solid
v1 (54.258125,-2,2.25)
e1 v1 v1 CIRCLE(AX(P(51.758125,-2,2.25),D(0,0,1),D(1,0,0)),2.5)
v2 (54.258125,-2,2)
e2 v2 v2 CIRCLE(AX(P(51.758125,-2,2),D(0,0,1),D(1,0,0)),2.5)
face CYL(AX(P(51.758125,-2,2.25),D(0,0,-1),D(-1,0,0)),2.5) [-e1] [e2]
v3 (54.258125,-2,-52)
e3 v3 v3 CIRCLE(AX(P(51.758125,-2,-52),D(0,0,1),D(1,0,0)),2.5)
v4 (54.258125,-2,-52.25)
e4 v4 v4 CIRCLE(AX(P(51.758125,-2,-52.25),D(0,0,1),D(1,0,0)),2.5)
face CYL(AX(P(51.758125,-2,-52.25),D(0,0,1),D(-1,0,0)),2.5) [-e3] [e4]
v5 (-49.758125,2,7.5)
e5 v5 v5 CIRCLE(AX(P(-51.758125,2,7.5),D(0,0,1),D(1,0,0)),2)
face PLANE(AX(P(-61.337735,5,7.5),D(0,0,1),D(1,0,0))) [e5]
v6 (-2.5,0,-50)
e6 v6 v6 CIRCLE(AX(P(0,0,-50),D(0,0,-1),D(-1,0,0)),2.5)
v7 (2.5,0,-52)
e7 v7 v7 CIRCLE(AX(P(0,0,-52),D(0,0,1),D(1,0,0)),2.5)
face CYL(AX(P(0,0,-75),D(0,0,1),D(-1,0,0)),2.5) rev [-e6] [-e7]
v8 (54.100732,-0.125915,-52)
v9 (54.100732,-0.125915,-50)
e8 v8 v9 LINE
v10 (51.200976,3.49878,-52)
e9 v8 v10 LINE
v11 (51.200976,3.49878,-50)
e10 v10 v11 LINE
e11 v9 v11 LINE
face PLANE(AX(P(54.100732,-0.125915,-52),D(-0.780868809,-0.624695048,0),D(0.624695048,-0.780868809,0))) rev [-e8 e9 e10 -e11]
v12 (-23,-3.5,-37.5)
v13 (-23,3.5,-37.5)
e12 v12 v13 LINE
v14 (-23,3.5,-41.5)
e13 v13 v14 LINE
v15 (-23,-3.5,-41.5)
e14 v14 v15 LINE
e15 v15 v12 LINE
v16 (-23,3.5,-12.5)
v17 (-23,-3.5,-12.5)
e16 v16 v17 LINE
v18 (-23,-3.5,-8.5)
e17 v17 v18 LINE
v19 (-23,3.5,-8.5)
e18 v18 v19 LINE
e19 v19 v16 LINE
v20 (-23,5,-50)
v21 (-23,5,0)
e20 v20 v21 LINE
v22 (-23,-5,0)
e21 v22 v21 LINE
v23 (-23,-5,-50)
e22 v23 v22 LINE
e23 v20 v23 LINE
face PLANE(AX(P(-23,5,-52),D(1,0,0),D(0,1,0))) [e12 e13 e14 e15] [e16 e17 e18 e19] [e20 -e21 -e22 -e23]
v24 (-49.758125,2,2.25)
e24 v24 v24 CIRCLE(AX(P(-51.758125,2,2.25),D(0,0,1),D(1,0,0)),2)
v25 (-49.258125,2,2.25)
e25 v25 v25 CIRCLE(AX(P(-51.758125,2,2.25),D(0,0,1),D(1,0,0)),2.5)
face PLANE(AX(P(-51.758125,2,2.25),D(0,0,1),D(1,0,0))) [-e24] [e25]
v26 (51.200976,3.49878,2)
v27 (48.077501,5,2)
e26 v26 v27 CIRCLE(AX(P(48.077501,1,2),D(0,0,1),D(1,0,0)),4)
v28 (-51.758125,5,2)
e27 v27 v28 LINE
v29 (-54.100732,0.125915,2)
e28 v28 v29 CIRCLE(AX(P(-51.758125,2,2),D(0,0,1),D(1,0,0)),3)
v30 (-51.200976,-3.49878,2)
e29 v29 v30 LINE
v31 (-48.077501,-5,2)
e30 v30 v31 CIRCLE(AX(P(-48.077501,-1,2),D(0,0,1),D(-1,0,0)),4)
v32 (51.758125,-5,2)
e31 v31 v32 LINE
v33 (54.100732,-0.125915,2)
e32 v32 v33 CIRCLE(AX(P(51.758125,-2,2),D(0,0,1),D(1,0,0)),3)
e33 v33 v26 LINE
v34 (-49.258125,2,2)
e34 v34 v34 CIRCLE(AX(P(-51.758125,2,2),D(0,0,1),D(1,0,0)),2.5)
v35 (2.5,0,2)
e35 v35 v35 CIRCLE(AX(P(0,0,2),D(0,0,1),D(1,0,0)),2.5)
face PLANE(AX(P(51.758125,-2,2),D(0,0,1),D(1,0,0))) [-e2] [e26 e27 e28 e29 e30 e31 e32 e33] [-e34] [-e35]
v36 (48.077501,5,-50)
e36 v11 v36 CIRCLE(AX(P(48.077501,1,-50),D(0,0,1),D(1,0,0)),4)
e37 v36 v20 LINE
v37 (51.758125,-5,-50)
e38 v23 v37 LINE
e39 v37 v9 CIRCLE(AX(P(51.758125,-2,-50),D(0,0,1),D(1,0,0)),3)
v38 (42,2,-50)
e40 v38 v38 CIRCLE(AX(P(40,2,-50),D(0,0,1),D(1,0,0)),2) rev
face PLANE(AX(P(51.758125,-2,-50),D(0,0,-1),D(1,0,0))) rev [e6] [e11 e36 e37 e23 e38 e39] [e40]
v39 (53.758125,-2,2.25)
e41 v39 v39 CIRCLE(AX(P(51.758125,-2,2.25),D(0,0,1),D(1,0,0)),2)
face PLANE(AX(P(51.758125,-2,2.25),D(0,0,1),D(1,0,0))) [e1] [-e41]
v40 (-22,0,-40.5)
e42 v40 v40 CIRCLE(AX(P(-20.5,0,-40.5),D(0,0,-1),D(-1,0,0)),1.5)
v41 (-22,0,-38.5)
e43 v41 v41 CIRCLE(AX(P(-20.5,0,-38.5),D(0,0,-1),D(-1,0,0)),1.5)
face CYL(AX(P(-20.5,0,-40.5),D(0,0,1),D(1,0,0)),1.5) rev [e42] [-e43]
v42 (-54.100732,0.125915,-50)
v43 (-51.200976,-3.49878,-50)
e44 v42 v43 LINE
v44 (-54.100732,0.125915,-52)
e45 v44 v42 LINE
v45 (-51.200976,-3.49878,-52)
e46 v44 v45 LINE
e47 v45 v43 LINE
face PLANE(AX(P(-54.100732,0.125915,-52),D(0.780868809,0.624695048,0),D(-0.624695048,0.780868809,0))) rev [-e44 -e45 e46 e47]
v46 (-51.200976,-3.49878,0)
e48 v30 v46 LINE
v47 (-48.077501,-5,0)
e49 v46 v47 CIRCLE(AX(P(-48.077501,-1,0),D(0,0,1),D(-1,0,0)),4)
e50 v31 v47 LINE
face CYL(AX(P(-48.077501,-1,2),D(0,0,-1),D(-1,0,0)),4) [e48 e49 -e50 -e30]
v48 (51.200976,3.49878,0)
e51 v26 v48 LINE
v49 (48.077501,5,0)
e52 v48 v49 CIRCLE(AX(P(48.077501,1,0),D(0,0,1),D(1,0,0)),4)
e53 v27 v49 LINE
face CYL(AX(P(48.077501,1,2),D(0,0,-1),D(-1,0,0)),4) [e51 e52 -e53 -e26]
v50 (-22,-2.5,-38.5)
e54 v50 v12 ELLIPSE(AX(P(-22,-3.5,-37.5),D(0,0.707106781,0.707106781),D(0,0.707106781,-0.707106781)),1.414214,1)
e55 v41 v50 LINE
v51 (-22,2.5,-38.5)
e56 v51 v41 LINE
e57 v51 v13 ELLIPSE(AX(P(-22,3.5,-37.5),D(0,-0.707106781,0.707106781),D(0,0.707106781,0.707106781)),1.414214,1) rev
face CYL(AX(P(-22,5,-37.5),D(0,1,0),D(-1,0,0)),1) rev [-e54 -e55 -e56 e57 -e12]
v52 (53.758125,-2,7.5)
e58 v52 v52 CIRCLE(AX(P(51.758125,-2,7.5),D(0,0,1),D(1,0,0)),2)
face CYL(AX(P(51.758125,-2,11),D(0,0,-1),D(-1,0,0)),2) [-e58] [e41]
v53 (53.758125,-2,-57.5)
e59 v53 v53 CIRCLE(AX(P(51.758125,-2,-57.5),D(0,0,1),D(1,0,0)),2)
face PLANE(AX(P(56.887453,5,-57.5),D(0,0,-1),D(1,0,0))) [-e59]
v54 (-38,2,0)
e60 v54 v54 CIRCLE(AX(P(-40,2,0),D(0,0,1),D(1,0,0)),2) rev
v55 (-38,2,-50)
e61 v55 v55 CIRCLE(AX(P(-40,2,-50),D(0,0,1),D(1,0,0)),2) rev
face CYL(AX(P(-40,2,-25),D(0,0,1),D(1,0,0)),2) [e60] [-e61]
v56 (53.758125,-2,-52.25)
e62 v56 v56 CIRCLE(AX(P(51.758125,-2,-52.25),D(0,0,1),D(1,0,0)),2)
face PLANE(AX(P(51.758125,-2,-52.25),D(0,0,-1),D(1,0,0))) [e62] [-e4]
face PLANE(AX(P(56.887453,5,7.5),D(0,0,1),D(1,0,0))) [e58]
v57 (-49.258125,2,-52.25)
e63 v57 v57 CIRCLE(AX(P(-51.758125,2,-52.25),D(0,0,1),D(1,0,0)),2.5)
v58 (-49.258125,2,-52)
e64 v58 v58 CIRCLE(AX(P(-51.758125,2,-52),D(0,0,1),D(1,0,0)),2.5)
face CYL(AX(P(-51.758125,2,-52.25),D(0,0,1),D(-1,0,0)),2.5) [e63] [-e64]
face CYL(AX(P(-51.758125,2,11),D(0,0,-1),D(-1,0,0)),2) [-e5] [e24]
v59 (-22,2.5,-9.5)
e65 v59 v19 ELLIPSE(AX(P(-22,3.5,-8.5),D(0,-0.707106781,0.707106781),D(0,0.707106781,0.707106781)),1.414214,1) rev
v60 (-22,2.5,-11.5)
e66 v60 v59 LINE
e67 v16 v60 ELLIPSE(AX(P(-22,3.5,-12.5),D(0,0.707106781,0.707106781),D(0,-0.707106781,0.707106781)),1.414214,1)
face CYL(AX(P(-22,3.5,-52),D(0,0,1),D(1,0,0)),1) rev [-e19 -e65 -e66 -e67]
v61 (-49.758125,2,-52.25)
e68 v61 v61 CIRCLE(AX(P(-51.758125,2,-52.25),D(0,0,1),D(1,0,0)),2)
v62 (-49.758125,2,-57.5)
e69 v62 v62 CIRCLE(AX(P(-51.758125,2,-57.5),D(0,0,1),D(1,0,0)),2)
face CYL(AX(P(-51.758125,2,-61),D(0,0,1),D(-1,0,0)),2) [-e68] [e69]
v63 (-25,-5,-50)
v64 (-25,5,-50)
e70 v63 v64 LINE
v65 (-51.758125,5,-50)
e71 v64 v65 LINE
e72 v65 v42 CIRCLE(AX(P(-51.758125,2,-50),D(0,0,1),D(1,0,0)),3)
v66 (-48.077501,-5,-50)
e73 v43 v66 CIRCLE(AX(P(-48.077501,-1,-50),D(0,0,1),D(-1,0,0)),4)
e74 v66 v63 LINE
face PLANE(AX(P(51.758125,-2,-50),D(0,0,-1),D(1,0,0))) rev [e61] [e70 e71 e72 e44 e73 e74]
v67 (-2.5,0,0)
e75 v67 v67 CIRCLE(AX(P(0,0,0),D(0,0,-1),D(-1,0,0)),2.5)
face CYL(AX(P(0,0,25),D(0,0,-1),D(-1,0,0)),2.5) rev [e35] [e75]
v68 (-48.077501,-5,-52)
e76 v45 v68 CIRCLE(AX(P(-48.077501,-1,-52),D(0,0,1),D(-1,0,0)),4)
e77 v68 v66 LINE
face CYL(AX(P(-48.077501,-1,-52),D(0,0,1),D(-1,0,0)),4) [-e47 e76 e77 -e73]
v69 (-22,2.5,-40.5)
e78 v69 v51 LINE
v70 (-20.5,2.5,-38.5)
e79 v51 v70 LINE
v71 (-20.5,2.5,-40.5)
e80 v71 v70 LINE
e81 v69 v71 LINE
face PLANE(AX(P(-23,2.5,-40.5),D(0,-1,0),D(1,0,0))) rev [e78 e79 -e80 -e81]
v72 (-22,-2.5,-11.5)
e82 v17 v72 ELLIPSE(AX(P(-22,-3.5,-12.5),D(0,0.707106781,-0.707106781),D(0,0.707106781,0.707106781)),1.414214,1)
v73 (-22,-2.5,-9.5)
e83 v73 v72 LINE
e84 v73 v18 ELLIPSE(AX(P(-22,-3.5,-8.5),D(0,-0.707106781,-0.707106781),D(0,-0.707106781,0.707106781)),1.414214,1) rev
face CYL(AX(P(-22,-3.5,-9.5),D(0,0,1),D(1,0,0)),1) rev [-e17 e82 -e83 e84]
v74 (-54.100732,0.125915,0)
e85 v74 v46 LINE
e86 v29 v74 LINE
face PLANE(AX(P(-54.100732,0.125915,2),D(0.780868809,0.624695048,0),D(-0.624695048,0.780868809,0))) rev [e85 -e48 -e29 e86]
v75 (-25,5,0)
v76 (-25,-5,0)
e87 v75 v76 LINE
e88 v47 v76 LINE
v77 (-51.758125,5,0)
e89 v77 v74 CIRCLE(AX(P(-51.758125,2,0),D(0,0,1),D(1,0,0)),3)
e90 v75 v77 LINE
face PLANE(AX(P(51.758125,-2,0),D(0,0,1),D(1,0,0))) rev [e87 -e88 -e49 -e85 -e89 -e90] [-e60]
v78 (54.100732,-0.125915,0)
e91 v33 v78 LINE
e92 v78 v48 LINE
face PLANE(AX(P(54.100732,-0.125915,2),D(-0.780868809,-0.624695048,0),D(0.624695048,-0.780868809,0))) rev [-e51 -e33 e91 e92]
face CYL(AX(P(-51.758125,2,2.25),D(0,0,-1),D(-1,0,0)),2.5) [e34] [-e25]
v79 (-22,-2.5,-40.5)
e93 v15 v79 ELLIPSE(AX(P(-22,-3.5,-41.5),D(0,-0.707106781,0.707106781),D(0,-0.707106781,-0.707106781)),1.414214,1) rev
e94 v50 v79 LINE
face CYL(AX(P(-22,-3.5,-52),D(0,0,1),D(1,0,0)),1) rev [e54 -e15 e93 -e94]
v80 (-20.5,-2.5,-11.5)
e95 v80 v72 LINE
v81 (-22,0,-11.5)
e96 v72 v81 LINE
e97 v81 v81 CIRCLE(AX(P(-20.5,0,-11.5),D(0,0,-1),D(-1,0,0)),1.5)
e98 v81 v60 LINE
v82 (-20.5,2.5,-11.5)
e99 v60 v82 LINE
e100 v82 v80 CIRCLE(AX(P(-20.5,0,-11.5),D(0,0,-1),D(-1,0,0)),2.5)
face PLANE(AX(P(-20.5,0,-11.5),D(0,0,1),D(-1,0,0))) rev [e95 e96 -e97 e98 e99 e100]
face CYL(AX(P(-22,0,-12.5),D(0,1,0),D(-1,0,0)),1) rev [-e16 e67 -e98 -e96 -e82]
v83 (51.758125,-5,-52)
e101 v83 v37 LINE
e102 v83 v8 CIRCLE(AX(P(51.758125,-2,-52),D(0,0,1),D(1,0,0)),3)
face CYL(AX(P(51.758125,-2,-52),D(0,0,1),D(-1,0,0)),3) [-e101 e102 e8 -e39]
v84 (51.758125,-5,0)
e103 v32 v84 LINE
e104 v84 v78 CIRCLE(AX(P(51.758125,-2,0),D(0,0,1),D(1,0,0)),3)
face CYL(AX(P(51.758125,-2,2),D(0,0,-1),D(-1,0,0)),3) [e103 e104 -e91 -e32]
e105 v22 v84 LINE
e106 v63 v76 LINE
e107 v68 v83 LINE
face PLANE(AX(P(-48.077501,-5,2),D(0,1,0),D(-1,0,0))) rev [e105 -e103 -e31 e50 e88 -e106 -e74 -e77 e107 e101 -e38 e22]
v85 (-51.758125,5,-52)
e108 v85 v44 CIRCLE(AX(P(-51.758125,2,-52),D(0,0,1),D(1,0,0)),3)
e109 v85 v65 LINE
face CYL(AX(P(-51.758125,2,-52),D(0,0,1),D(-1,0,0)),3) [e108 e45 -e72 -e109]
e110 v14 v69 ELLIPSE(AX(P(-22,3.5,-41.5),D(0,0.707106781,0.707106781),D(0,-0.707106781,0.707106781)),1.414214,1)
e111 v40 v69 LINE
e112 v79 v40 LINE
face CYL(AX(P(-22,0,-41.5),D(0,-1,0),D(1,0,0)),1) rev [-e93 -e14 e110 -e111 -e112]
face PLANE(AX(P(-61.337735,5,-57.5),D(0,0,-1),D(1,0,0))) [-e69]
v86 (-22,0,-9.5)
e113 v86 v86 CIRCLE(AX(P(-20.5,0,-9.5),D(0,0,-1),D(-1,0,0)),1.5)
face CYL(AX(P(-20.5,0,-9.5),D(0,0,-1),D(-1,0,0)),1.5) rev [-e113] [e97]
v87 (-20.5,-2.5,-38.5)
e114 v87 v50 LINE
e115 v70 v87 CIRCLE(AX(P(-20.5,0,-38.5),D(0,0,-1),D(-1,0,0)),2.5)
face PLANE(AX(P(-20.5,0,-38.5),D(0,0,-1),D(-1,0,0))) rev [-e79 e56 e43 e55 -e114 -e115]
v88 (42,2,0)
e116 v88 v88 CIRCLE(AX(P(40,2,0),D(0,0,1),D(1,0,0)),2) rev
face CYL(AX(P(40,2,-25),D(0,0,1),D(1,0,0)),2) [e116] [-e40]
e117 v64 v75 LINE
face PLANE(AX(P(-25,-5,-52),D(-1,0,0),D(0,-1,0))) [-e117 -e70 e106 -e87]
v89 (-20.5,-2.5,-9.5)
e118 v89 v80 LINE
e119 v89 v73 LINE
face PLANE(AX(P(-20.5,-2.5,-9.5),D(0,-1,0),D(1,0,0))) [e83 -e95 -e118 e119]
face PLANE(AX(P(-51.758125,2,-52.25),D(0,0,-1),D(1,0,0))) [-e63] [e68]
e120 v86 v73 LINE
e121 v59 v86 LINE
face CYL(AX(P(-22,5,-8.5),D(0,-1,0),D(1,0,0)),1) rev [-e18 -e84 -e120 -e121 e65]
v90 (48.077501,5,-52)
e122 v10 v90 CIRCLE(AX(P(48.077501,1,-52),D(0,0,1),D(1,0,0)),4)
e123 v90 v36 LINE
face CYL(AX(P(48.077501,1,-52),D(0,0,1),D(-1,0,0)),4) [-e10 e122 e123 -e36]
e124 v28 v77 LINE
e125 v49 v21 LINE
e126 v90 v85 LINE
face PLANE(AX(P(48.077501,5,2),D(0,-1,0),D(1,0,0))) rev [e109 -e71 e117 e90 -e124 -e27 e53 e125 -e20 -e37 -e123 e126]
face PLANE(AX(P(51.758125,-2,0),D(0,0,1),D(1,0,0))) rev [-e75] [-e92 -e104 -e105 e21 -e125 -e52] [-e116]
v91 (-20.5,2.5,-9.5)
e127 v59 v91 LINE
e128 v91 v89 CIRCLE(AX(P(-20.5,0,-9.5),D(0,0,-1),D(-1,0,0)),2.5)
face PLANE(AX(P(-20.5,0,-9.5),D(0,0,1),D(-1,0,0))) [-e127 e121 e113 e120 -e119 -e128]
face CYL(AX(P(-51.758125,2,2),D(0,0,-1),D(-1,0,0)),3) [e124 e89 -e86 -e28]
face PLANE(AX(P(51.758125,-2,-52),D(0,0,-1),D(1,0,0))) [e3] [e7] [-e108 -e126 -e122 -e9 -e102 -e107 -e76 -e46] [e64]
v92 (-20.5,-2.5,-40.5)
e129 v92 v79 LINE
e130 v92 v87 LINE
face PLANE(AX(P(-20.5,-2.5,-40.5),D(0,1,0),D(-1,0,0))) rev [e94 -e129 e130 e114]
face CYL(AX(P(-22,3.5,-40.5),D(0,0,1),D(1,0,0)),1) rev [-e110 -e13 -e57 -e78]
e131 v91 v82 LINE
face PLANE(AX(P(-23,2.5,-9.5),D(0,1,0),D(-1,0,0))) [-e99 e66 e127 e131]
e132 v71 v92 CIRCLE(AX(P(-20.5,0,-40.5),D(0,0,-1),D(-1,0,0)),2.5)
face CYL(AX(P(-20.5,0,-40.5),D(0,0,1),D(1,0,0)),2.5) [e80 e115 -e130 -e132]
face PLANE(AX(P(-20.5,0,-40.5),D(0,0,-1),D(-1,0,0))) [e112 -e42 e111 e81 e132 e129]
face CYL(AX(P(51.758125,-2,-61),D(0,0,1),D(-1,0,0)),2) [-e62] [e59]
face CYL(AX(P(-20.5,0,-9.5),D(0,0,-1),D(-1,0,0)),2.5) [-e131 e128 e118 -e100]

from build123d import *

# Parameters (mm, degrees)
EXTRUDE_1_DEPTH          = 2
SKETCH_3_R               = 2
EXTRUDE_2_DEPTH          = 9
SKETCH_4_R               = 2
EXTRUDE_3_DEPTH          = 25
SKETCH_5_R               = 2.5
CUT_EXTRUDE_2_DEPTH      = 25
SKETCH_7_R               = 2.5
EXTRUDE_4_DEPTH          = 0.25
CUT_EXTRUDE_3_DEPTH      = 61.402419684
CUT_EXTRUDE_3_DEPTH_BACK = 10
SKETCH_8_W               = 14.774450984
SKETCH_8_H               = 5.235041687
SKETCH_8_W_2             = 21.085271114
SKETCH_8_H_2             = 10.942988806
SKETCH_9_W               = 2
SKETCH_9_H               = 10
EXTRUDE_5_DEPTH          = 54
EXTRUDE_START            = 13.5
SKETCH_10_R              = 1.5
EXTRUDE_6_DEPTH          = 2
FILLET_3_R               = 1
FILLET_3_OF_MIRROR_5_R   = 1


with BuildPart() as part:
    # 草圖1 → 填料-伸長1 (new body)
    with BuildSketch(Plane.XY):
        with BuildLine():
            Line((-48.07750061, -5), (51.758125458, -5))
            ThreePointArc((51.758125458, -5), (54.462035166, -3.299566191), (54.100731886, -0.125914857))
            Line((54.100731886, -0.125914857), (51.200975848, 3.49878019))
            ThreePointArc((51.200975848, 3.49878019), (49.810255532, 4.605212945), (48.07750061, 5))
            Line((48.07750061, 5), (-51.758125458, 5))
            ThreePointArc((-51.758125458, 5), (-54.462035166, 3.299566191), (-54.100731886, 0.125914857))
            Line((-54.100731886, 0.125914857), (-51.200975848, -3.49878019))
            ThreePointArc((-51.200975848, -3.49878019), (-49.810255532, -4.605212945), (-48.07750061, -5))
        make_face()
    extrude(amount=EXTRUDE_1_DEPTH)

    # 草圖3 → 填料-伸長2 (add)
    with BuildSketch(Plane.XY.offset(2)):
        with Locations((-51.758125458, 2)):
            Circle(SKETCH_3_R)
        with Locations((51.758125458, -2)):
            Circle(SKETCH_3_R)
    extrude(amount=EXTRUDE_2_DEPTH)

    # 草圖4 → 填料-伸長3 (add)
    with BuildSketch(Plane(origin=(0, 0, 0), x_dir=(-1, 0, 0), z_dir=(0, 0, -1))):
        with Locations(Location((-40, 2, 0), (0, 0, 180))):
            Circle(SKETCH_4_R)
        with Locations(Location((40, 2, 0), (0, 0, 180))):
            Circle(SKETCH_4_R)
    extrude(amount=EXTRUDE_3_DEPTH)

    # 草圖5 → 除料-伸長2 (cut)
    with BuildSketch(Plane(origin=(0, 0, 0), x_dir=(-1, 0, 0), z_dir=(0, 0, -1))):
        Circle(SKETCH_5_R)
    extrude(amount=-CUT_EXTRUDE_2_DEPTH, mode=Mode.SUBTRACT)

    # 草圖7 → 填料-伸長4 (add)
    with BuildSketch(Plane.XY.offset(2)):
        with Locations((51.758125458, -2)):
            Circle(SKETCH_7_R)
        with Locations((-51.758125458, 2)):
            Circle(SKETCH_7_R)
    extrude(amount=EXTRUDE_4_DEPTH)

    # 草圖8 → 除料-伸長3 (cut, two sides: drawn at the far end of the back side and taken through both)
    with BuildSketch(Plane(origin=(0, 0, 0), x_dir=(1, 0, 0), z_dir=(0, 1, 0)).offset(-CUT_EXTRUDE_3_DEPTH_BACK)):
        with Locations((49.50022751, -10.117520844)):
            Rectangle(SKETCH_8_W, SKETCH_8_H)
        with Locations((-50.795099296, -12.971494403)):
            Rectangle(SKETCH_8_W_2, SKETCH_8_H_2)
    extrude(amount=CUT_EXTRUDE_3_DEPTH + CUT_EXTRUDE_3_DEPTH_BACK, mode=Mode.SUBTRACT)

    # 鏡射1: part across plane


with BuildPart() as part_1:
    add(part.part)
    add(part.part.mirror(Plane(origin=(-40, 2, -25), x_dir=(1, 0, 0), z_dir=(0, 0, 1))))

    # 草圖9 → 填料-伸長5 (add)
    with BuildSketch(Plane.XY.offset(2)):
        with Locations((-24, 0)):
            Rectangle(SKETCH_9_W, SKETCH_9_H)
    extrude(amount=-EXTRUDE_5_DEPTH)

    # 草圖10 → 填料-伸長6 (add)
    with BuildSketch(Plane(origin=(0, 0, -25), x_dir=(-1, 0, 0), z_dir=(0, 0, -1)).offset(EXTRUDE_START)):
        with BuildLine():
            Line((23, 2.5), (20.5, 2.5))
            ThreePointArc((20.5, 2.5), (18, 0), (20.5, -2.5))
            Line((20.5, -2.5), (23, -2.5))
            Line((23, -2.5), (23, 2.5))
        make_face()
        with Locations((20.5, 0)):
            Circle(SKETCH_10_R, mode=Mode.SUBTRACT)
    extrude_6 = extrude(amount=EXTRUDE_6_DEPTH)

    # 圓角3
    fillet_3_edges = [part_1.edges().sort_by_distance(p)[0] for p in [
        (-23, 0, -40.5),
        (-23, 0, -38.5),
        (-23, -2.5, -39.5),
        (-23, 2.5, -39.5),
    ]]
    fillet(fillet_3_edges, radius=FILLET_3_R - 0.0001)  # a hair under: the kernel refuses the full size

    # 鏡射5: 填料-伸長6 across plane
    add(extrude_6.mirror(Plane(origin=(0, 0, -25), x_dir=(1, 0, 0), z_dir=(0, 0, -1))))

    # 圓角3 of 鏡射5
    fillet_3_of_mirror_5_edges = [part_1.edges().sort_by_distance(p)[0] for p in [
        (-23, 0, -9.5),
        (-23, 0, -11.5),
        (-23, -2.5, -10.5),
        (-23, 2.5, -10.5),
    ]]
    fillet(fillet_3_of_mirror_5_edges, radius=FILLET_3_OF_MIRROR_5_R - 0.0001)  # a hair under: the kernel refuses the full size


solid = part_1.part
